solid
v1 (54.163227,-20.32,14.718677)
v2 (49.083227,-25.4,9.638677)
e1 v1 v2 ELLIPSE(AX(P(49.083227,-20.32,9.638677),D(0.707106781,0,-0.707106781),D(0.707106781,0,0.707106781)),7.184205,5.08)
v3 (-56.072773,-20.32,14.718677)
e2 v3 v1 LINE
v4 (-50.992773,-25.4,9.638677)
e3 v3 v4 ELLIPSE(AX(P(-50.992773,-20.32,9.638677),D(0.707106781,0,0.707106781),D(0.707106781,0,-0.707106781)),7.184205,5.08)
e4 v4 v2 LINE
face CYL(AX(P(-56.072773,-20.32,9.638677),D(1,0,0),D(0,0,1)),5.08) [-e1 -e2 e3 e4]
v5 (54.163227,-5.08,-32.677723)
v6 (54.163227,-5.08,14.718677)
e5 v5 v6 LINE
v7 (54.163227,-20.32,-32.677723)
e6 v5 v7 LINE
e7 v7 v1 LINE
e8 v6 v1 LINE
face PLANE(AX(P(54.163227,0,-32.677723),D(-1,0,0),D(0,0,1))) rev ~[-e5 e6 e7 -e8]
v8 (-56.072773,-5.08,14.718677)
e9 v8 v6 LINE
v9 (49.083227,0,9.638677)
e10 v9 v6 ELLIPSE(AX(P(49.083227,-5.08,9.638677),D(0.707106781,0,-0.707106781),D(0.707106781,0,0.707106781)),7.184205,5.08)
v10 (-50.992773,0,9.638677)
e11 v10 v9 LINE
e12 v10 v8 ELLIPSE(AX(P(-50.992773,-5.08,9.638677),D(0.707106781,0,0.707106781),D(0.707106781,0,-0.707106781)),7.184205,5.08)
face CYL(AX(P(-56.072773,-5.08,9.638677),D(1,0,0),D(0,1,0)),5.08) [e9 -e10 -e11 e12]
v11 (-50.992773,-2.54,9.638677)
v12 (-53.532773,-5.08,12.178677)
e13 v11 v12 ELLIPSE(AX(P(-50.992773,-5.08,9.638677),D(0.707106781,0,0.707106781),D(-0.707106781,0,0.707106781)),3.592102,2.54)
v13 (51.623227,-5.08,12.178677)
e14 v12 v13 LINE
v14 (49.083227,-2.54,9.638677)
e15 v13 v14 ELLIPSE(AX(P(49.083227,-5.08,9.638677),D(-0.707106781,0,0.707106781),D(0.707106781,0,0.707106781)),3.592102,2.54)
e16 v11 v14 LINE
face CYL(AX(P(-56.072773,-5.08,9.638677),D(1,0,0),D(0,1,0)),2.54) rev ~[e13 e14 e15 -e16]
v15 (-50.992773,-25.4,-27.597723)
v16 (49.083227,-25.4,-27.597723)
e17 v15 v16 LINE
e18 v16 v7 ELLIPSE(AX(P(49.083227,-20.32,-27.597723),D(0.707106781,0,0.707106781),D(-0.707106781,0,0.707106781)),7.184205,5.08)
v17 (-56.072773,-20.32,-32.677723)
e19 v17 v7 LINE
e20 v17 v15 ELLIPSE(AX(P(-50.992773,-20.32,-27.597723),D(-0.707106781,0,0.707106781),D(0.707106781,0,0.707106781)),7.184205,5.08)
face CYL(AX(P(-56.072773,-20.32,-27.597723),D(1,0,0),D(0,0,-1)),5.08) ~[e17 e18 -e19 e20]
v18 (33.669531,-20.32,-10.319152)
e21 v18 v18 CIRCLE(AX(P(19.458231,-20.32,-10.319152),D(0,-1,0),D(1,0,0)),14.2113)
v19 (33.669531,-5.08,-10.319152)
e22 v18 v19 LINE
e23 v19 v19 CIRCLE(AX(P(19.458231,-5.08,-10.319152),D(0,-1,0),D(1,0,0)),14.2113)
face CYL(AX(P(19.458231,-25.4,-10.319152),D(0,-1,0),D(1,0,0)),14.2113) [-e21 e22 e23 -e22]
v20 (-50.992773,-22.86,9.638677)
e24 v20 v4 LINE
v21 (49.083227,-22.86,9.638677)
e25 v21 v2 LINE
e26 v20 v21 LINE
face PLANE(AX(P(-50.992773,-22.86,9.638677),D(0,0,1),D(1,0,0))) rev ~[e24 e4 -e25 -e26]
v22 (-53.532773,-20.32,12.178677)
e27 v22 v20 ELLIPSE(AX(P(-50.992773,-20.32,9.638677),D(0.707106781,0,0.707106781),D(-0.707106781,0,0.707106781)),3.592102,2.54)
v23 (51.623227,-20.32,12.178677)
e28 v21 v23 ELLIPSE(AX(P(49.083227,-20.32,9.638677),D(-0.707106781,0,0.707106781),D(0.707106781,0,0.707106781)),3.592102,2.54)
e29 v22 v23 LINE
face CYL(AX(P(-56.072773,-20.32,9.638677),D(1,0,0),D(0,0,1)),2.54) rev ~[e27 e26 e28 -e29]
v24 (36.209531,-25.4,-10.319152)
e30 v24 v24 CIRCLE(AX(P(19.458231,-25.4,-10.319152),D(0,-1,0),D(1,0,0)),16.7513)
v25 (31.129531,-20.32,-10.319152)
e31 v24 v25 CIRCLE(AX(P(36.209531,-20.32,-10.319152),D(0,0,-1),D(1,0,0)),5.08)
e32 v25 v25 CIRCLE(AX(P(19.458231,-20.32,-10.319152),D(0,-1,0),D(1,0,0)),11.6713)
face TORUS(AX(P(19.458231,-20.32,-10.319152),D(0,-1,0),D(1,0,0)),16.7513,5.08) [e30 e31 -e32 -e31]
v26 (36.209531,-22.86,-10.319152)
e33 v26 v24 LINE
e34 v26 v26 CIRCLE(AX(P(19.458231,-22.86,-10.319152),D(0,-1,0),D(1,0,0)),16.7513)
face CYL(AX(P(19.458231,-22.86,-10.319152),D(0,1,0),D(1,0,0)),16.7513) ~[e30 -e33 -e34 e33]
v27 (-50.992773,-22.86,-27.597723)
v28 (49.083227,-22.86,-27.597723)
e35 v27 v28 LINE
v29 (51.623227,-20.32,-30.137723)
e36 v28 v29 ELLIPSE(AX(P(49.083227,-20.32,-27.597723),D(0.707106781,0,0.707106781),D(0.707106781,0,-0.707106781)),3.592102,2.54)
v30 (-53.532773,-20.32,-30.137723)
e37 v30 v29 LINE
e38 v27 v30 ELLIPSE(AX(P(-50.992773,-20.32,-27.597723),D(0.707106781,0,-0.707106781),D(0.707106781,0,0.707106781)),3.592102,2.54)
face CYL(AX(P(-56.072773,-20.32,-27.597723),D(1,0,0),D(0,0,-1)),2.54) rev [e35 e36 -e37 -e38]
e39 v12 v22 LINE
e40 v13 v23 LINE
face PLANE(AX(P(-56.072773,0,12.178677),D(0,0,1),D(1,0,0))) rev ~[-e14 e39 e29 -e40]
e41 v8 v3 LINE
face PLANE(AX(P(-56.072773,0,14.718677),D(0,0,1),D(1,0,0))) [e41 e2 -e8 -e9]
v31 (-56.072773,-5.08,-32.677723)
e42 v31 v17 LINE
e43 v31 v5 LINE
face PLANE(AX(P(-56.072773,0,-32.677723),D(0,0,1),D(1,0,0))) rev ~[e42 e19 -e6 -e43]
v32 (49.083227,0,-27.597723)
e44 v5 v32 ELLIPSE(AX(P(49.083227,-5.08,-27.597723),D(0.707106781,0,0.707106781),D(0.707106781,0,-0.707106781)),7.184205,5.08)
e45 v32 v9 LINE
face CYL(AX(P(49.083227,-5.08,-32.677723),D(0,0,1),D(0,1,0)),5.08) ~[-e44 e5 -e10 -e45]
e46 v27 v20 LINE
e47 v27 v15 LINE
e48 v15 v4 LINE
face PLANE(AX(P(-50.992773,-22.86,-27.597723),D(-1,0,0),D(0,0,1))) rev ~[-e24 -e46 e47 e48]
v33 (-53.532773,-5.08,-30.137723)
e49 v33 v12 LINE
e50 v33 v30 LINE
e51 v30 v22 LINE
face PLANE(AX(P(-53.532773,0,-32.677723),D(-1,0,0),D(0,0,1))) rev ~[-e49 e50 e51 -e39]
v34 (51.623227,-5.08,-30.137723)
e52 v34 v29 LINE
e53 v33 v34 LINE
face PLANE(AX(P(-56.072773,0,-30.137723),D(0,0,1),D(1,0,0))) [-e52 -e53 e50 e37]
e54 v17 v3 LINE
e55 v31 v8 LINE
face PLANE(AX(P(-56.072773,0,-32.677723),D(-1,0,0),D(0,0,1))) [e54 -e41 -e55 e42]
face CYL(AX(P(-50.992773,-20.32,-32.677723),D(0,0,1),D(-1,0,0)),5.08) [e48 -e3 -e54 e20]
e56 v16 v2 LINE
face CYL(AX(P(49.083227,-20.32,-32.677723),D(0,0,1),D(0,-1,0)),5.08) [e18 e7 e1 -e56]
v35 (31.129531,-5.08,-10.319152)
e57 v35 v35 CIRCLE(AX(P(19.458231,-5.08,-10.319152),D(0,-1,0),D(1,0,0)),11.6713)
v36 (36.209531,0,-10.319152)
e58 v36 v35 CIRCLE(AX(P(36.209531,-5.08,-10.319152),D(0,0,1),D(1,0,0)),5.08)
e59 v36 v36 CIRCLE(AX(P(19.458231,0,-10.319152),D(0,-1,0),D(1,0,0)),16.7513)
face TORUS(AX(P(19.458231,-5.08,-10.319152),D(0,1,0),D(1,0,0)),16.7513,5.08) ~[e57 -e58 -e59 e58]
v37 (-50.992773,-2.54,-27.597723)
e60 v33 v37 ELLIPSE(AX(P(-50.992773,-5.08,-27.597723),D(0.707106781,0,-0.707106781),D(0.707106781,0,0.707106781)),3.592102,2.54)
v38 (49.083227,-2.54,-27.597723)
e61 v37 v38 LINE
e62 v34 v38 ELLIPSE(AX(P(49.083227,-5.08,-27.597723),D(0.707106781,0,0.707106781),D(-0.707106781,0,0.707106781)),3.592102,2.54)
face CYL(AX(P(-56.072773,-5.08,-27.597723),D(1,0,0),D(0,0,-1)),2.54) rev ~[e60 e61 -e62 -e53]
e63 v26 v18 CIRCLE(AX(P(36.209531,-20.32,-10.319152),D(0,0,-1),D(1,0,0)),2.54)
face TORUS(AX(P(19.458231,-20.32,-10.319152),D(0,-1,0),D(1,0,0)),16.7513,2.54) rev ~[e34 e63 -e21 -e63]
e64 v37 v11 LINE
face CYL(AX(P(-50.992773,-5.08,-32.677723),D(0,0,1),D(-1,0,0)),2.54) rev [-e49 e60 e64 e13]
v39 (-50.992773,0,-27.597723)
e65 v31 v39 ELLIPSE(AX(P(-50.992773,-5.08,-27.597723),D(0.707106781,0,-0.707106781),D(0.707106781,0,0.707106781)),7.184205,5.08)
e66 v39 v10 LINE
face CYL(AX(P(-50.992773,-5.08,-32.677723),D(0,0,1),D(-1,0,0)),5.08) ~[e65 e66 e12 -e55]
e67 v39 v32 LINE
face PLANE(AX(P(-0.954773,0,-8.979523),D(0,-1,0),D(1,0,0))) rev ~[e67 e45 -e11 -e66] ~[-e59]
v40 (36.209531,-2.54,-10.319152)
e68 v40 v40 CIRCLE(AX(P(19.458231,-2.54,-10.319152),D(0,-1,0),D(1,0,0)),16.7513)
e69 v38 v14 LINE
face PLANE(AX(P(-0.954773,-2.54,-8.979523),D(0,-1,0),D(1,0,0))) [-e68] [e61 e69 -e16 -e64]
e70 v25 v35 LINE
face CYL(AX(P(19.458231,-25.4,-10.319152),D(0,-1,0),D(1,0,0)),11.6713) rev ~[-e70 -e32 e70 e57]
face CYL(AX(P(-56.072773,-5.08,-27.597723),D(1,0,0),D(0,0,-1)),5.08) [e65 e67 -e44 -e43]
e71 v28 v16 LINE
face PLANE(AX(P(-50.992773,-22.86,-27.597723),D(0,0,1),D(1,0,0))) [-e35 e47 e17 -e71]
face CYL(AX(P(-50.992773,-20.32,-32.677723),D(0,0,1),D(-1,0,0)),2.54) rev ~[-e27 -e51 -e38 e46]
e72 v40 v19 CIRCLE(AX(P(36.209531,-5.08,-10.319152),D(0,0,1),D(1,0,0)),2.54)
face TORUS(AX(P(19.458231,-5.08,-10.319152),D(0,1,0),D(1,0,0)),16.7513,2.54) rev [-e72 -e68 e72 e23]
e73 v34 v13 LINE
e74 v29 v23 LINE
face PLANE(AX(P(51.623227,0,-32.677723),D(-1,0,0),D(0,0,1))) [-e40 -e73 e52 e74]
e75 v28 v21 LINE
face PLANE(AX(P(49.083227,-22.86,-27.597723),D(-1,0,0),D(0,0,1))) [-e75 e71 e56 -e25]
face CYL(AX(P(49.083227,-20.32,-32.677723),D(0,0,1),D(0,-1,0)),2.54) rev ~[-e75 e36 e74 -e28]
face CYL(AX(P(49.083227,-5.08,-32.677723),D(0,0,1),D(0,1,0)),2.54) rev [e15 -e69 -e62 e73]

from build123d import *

# Parameters (mm, degrees)
F0_W     = 110.236
F0_H     = 47.3964
F1_DEPTH = 25.4
F2_R     = 11.6713
F3_DEPTH = 25.4
F4_R     = 5.08
F5_R     = 5.08
F6_T     = -2.54


# Not quite as in the source:
# - a shell that OpenCascade refuses in one call is made with other operations: the cavity is built on its own and cut out


with BuildPart() as f1:
    # F0 (on Front) → F1 (new body)
    with BuildSketch(Plane.XZ):
        with Locations((-0.954773277, -8.9795228673)):
            Rectangle(F0_W, F0_H)
    extrude(amount=F1_DEPTH)

    # F2 (on face) → F3 (cut, through all)
    with BuildSketch(Plane.XZ.offset(25.4)):
        with Locations((19.4582305849, -10.3191519156)):
            Circle(F2_R)
    extrude(amount=-F3_DEPTH, mode=Mode.SUBTRACT)

    # F4
    f4_edges = [f1.edges().sort_by_distance(p)[0] for p in [
        (7.786931, -25.4, -10.319152),
        (-0.954773, -25.4, 14.718677),
        (54.163227, -25.4, -8.979523),
        (-0.954773, -25.4, -32.677723),
        (-56.072773, -25.4, -8.979523),
        (7.786931, 0, -10.319152),
    ]]
    fillet(f4_edges, radius=F4_R)

    # F5
    f5_edges = [f1.edges().sort_by_distance(p)[0] for p in [
        (-0.954773, 0, 14.718677),
        (-56.072773, 0, -8.979523),
        (-0.954773, 0, -32.677723),
        (54.163227, 0, -8.979523),
    ]]
    fillet(f5_edges, radius=F5_R)

    # F6: a shell. OpenCascade refuses it in one call, so the cavity is built on its own and cut out:
    # the body offset inwards by the wall thickness, plus a prism from it out through each open face.
    f6_core = offset(f1.part, amount=F6_T, mode=Mode.PRIVATE)
    f6_exits = [f6_core.faces().sort_by_distance(p)[0] for p in [
        (-7.280112, -22.86, -8.564415),
    ]]
    add(f6_core, mode=Mode.SUBTRACT)
    extrude(f6_exits, amount=-F6_T, mode=Mode.SUBTRACT)


solid = f1.part
